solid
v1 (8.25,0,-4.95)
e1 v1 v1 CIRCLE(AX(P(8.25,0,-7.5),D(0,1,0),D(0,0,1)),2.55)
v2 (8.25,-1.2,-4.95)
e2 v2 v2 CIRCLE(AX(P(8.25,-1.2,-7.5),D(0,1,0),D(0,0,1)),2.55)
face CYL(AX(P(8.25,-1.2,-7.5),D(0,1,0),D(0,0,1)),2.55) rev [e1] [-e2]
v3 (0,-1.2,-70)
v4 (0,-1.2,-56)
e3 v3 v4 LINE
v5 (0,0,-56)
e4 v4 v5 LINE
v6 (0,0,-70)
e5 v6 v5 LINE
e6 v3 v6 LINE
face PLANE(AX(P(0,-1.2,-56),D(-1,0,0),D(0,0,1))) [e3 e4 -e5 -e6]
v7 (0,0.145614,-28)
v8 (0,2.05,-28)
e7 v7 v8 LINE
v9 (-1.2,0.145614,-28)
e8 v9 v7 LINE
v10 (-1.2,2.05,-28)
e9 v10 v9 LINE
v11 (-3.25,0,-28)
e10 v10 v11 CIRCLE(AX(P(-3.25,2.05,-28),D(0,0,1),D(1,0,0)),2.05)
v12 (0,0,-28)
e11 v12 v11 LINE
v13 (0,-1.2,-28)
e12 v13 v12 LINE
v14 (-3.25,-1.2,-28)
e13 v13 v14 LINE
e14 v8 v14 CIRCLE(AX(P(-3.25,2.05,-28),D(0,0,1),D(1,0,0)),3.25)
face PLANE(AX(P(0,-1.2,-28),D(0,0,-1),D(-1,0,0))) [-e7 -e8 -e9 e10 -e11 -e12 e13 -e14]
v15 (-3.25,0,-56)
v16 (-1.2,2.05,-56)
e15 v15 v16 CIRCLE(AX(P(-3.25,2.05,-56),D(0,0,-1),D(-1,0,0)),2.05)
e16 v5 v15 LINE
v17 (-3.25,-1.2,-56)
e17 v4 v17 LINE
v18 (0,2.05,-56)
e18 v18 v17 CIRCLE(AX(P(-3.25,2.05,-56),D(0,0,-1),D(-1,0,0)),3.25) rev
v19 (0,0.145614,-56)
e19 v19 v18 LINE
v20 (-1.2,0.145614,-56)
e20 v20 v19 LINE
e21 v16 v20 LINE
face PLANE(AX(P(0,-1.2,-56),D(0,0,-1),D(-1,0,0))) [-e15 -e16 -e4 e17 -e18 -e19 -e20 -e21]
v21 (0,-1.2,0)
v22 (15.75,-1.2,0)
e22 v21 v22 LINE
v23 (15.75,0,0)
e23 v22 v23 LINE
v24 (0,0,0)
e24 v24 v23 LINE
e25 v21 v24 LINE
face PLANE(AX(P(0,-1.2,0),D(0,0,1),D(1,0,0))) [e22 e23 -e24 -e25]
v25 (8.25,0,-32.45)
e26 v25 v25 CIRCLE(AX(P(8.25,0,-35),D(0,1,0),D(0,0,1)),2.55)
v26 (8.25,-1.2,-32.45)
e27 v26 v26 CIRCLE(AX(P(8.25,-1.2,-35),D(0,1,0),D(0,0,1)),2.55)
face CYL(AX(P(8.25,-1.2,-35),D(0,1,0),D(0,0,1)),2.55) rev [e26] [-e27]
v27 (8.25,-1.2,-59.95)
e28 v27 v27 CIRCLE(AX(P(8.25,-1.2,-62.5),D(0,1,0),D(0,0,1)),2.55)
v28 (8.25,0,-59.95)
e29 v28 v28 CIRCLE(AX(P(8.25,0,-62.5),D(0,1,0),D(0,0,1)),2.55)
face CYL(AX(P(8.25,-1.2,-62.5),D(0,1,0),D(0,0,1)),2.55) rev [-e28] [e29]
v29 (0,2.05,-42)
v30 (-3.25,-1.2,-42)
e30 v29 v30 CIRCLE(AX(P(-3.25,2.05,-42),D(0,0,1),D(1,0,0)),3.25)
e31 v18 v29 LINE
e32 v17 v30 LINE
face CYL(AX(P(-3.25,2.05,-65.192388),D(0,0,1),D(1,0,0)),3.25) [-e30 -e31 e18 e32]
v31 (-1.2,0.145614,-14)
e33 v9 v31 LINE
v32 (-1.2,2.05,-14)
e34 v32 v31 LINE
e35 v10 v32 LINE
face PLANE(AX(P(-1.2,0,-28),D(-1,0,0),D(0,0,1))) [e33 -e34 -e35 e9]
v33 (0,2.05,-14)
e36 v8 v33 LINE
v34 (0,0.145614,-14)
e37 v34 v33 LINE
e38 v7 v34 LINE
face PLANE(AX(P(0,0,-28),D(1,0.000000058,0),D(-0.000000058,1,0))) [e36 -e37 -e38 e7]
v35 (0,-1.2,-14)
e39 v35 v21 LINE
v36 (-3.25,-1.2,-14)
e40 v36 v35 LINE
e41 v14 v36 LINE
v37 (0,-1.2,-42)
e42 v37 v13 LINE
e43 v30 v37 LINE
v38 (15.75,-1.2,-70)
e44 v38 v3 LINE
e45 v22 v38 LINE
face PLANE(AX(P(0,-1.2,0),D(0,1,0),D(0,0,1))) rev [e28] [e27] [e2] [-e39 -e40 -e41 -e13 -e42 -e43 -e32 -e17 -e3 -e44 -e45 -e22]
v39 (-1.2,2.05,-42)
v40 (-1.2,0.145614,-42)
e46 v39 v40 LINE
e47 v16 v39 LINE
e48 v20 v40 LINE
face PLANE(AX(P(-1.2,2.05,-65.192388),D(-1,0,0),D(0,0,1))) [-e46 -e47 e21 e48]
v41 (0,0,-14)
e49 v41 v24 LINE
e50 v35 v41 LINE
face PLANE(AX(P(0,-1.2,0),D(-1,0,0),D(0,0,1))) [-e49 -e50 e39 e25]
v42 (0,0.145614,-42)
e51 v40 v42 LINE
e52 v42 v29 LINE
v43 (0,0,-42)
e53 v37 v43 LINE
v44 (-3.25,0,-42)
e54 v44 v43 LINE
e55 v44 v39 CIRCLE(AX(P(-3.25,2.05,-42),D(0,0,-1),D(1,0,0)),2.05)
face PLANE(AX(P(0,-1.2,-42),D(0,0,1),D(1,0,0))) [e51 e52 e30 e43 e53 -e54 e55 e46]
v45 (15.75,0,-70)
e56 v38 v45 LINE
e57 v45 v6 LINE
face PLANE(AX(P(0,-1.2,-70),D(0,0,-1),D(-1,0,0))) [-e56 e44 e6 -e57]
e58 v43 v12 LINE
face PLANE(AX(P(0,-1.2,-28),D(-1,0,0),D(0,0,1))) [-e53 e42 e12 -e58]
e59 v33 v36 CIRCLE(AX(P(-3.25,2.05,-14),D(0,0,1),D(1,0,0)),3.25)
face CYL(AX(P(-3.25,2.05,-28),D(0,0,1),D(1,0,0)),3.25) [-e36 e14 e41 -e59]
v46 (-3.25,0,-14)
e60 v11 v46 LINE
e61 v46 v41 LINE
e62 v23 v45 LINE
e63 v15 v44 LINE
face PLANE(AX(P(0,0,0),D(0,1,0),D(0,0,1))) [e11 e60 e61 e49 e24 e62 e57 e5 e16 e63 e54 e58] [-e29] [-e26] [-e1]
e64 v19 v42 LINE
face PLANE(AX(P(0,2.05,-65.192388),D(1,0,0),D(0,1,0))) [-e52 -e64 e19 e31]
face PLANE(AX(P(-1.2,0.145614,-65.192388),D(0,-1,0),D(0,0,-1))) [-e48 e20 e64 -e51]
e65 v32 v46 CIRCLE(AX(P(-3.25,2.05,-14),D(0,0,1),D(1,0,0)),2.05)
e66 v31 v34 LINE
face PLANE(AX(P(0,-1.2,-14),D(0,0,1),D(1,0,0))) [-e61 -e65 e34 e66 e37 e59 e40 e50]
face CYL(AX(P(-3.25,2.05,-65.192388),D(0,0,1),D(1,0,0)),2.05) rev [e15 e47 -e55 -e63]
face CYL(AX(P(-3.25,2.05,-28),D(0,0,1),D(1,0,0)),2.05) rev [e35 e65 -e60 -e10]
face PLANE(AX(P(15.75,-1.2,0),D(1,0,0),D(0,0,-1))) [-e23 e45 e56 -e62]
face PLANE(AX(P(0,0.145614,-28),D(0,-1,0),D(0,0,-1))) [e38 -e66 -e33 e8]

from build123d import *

# Parameters (mm, degrees)
SKETCH1_R           = 2.55
BASE_FLANGE1_DEPTH  = 1.2
BOSS_EXTRUDE1_DEPTH = 14
SKETCH11_W          = 1
SKETCH11_H          = 1.2
BOSS_EXTRUDE2_DEPTH = 14


# Sheet-metal steps are written as plain solids
with BuildPart() as part:
    # Sketch1 → Base-Flange1 (new body)
    with BuildSketch(Plane(origin=(0, 0, 0), x_dir=(1, 0, 0), z_dir=(0, 1, 0))):
        Polygon((0, 28), (0, 42), (-1, 42), (-1, 56), (0, 56), (0, 70), (15.75, 70), (15.75, 0), (0, 0), (0, 14), (-1, 14), (-1, 28), align=None)
        with Locations(Location((8.25, 62.5, 0), (0, 0, 270))):
            Circle(SKETCH1_R, mode=Mode.SUBTRACT)
        with Locations(Location((8.25, 35, 0), (0, 0, 270))):
            Circle(SKETCH1_R, mode=Mode.SUBTRACT)
        with Locations(Location((8.25, 7.5, 0), (0, 0, 270))):
            Circle(SKETCH1_R, mode=Mode.SUBTRACT)
    extrude(amount=-BASE_FLANGE1_DEPTH)

    # Sketch10 → Boss-Extrude1 (add)
    with BuildSketch(Plane.XY.offset(-42)):
        with BuildLine():
            Line((-3.25, -1.2), (-1, -1.2))
            Line((-1, -1.2), (0, -1.2))
            Line((0, -1.2), (0, 0))
            Line((0, 0), (-3.25, 0))
            ThreePointArc((-3.25, 0), (-4.699568901, 3.499568901), (-1.2, 2.05))
            Line((-1.2, 2.05), (-1.2, 0.145614193))
            Line((-1.2, 0.145614193), (0, 0.145614193))
            Line((0, 0.145614193), (0, 2.05))
            ThreePointArc((0, 2.05), (-5.548097039, 4.348097039), (-3.25, -1.2))
        make_face()
    extrude(amount=-BOSS_EXTRUDE1_DEPTH)

    # Sketch11 → Boss-Extrude2 (add)
    with BuildSketch(Plane.XY.offset(-14)):
        with BuildLine():
            ThreePointArc((-3.25, 0), (-4.699568901, 3.499568901), (-1.2, 2.05))
            Line((-1.2, 2.05), (-1.2, 0.145614193))
            Line((-1.2, 0.145614193), (0, 0.145614193))
            Line((0, 0.145614193), (-1.1e-07, 2.05))
            ThreePointArc((-1.1e-07, 2.05), (-5.548097133, 4.348096945), (-3.25, -1.2))
            Line((-3.25, -1.2), (-1, -1.2))
            Line((-1, -1.2), (-1, 0))
            Line((-1, 0), (-3.25, 0))
        make_face()
        with Locations((-0.5, -0.6)):
            Rectangle(SKETCH11_W, SKETCH11_H)
    extrude(amount=-BOSS_EXTRUDE2_DEPTH)


solid = part.part
